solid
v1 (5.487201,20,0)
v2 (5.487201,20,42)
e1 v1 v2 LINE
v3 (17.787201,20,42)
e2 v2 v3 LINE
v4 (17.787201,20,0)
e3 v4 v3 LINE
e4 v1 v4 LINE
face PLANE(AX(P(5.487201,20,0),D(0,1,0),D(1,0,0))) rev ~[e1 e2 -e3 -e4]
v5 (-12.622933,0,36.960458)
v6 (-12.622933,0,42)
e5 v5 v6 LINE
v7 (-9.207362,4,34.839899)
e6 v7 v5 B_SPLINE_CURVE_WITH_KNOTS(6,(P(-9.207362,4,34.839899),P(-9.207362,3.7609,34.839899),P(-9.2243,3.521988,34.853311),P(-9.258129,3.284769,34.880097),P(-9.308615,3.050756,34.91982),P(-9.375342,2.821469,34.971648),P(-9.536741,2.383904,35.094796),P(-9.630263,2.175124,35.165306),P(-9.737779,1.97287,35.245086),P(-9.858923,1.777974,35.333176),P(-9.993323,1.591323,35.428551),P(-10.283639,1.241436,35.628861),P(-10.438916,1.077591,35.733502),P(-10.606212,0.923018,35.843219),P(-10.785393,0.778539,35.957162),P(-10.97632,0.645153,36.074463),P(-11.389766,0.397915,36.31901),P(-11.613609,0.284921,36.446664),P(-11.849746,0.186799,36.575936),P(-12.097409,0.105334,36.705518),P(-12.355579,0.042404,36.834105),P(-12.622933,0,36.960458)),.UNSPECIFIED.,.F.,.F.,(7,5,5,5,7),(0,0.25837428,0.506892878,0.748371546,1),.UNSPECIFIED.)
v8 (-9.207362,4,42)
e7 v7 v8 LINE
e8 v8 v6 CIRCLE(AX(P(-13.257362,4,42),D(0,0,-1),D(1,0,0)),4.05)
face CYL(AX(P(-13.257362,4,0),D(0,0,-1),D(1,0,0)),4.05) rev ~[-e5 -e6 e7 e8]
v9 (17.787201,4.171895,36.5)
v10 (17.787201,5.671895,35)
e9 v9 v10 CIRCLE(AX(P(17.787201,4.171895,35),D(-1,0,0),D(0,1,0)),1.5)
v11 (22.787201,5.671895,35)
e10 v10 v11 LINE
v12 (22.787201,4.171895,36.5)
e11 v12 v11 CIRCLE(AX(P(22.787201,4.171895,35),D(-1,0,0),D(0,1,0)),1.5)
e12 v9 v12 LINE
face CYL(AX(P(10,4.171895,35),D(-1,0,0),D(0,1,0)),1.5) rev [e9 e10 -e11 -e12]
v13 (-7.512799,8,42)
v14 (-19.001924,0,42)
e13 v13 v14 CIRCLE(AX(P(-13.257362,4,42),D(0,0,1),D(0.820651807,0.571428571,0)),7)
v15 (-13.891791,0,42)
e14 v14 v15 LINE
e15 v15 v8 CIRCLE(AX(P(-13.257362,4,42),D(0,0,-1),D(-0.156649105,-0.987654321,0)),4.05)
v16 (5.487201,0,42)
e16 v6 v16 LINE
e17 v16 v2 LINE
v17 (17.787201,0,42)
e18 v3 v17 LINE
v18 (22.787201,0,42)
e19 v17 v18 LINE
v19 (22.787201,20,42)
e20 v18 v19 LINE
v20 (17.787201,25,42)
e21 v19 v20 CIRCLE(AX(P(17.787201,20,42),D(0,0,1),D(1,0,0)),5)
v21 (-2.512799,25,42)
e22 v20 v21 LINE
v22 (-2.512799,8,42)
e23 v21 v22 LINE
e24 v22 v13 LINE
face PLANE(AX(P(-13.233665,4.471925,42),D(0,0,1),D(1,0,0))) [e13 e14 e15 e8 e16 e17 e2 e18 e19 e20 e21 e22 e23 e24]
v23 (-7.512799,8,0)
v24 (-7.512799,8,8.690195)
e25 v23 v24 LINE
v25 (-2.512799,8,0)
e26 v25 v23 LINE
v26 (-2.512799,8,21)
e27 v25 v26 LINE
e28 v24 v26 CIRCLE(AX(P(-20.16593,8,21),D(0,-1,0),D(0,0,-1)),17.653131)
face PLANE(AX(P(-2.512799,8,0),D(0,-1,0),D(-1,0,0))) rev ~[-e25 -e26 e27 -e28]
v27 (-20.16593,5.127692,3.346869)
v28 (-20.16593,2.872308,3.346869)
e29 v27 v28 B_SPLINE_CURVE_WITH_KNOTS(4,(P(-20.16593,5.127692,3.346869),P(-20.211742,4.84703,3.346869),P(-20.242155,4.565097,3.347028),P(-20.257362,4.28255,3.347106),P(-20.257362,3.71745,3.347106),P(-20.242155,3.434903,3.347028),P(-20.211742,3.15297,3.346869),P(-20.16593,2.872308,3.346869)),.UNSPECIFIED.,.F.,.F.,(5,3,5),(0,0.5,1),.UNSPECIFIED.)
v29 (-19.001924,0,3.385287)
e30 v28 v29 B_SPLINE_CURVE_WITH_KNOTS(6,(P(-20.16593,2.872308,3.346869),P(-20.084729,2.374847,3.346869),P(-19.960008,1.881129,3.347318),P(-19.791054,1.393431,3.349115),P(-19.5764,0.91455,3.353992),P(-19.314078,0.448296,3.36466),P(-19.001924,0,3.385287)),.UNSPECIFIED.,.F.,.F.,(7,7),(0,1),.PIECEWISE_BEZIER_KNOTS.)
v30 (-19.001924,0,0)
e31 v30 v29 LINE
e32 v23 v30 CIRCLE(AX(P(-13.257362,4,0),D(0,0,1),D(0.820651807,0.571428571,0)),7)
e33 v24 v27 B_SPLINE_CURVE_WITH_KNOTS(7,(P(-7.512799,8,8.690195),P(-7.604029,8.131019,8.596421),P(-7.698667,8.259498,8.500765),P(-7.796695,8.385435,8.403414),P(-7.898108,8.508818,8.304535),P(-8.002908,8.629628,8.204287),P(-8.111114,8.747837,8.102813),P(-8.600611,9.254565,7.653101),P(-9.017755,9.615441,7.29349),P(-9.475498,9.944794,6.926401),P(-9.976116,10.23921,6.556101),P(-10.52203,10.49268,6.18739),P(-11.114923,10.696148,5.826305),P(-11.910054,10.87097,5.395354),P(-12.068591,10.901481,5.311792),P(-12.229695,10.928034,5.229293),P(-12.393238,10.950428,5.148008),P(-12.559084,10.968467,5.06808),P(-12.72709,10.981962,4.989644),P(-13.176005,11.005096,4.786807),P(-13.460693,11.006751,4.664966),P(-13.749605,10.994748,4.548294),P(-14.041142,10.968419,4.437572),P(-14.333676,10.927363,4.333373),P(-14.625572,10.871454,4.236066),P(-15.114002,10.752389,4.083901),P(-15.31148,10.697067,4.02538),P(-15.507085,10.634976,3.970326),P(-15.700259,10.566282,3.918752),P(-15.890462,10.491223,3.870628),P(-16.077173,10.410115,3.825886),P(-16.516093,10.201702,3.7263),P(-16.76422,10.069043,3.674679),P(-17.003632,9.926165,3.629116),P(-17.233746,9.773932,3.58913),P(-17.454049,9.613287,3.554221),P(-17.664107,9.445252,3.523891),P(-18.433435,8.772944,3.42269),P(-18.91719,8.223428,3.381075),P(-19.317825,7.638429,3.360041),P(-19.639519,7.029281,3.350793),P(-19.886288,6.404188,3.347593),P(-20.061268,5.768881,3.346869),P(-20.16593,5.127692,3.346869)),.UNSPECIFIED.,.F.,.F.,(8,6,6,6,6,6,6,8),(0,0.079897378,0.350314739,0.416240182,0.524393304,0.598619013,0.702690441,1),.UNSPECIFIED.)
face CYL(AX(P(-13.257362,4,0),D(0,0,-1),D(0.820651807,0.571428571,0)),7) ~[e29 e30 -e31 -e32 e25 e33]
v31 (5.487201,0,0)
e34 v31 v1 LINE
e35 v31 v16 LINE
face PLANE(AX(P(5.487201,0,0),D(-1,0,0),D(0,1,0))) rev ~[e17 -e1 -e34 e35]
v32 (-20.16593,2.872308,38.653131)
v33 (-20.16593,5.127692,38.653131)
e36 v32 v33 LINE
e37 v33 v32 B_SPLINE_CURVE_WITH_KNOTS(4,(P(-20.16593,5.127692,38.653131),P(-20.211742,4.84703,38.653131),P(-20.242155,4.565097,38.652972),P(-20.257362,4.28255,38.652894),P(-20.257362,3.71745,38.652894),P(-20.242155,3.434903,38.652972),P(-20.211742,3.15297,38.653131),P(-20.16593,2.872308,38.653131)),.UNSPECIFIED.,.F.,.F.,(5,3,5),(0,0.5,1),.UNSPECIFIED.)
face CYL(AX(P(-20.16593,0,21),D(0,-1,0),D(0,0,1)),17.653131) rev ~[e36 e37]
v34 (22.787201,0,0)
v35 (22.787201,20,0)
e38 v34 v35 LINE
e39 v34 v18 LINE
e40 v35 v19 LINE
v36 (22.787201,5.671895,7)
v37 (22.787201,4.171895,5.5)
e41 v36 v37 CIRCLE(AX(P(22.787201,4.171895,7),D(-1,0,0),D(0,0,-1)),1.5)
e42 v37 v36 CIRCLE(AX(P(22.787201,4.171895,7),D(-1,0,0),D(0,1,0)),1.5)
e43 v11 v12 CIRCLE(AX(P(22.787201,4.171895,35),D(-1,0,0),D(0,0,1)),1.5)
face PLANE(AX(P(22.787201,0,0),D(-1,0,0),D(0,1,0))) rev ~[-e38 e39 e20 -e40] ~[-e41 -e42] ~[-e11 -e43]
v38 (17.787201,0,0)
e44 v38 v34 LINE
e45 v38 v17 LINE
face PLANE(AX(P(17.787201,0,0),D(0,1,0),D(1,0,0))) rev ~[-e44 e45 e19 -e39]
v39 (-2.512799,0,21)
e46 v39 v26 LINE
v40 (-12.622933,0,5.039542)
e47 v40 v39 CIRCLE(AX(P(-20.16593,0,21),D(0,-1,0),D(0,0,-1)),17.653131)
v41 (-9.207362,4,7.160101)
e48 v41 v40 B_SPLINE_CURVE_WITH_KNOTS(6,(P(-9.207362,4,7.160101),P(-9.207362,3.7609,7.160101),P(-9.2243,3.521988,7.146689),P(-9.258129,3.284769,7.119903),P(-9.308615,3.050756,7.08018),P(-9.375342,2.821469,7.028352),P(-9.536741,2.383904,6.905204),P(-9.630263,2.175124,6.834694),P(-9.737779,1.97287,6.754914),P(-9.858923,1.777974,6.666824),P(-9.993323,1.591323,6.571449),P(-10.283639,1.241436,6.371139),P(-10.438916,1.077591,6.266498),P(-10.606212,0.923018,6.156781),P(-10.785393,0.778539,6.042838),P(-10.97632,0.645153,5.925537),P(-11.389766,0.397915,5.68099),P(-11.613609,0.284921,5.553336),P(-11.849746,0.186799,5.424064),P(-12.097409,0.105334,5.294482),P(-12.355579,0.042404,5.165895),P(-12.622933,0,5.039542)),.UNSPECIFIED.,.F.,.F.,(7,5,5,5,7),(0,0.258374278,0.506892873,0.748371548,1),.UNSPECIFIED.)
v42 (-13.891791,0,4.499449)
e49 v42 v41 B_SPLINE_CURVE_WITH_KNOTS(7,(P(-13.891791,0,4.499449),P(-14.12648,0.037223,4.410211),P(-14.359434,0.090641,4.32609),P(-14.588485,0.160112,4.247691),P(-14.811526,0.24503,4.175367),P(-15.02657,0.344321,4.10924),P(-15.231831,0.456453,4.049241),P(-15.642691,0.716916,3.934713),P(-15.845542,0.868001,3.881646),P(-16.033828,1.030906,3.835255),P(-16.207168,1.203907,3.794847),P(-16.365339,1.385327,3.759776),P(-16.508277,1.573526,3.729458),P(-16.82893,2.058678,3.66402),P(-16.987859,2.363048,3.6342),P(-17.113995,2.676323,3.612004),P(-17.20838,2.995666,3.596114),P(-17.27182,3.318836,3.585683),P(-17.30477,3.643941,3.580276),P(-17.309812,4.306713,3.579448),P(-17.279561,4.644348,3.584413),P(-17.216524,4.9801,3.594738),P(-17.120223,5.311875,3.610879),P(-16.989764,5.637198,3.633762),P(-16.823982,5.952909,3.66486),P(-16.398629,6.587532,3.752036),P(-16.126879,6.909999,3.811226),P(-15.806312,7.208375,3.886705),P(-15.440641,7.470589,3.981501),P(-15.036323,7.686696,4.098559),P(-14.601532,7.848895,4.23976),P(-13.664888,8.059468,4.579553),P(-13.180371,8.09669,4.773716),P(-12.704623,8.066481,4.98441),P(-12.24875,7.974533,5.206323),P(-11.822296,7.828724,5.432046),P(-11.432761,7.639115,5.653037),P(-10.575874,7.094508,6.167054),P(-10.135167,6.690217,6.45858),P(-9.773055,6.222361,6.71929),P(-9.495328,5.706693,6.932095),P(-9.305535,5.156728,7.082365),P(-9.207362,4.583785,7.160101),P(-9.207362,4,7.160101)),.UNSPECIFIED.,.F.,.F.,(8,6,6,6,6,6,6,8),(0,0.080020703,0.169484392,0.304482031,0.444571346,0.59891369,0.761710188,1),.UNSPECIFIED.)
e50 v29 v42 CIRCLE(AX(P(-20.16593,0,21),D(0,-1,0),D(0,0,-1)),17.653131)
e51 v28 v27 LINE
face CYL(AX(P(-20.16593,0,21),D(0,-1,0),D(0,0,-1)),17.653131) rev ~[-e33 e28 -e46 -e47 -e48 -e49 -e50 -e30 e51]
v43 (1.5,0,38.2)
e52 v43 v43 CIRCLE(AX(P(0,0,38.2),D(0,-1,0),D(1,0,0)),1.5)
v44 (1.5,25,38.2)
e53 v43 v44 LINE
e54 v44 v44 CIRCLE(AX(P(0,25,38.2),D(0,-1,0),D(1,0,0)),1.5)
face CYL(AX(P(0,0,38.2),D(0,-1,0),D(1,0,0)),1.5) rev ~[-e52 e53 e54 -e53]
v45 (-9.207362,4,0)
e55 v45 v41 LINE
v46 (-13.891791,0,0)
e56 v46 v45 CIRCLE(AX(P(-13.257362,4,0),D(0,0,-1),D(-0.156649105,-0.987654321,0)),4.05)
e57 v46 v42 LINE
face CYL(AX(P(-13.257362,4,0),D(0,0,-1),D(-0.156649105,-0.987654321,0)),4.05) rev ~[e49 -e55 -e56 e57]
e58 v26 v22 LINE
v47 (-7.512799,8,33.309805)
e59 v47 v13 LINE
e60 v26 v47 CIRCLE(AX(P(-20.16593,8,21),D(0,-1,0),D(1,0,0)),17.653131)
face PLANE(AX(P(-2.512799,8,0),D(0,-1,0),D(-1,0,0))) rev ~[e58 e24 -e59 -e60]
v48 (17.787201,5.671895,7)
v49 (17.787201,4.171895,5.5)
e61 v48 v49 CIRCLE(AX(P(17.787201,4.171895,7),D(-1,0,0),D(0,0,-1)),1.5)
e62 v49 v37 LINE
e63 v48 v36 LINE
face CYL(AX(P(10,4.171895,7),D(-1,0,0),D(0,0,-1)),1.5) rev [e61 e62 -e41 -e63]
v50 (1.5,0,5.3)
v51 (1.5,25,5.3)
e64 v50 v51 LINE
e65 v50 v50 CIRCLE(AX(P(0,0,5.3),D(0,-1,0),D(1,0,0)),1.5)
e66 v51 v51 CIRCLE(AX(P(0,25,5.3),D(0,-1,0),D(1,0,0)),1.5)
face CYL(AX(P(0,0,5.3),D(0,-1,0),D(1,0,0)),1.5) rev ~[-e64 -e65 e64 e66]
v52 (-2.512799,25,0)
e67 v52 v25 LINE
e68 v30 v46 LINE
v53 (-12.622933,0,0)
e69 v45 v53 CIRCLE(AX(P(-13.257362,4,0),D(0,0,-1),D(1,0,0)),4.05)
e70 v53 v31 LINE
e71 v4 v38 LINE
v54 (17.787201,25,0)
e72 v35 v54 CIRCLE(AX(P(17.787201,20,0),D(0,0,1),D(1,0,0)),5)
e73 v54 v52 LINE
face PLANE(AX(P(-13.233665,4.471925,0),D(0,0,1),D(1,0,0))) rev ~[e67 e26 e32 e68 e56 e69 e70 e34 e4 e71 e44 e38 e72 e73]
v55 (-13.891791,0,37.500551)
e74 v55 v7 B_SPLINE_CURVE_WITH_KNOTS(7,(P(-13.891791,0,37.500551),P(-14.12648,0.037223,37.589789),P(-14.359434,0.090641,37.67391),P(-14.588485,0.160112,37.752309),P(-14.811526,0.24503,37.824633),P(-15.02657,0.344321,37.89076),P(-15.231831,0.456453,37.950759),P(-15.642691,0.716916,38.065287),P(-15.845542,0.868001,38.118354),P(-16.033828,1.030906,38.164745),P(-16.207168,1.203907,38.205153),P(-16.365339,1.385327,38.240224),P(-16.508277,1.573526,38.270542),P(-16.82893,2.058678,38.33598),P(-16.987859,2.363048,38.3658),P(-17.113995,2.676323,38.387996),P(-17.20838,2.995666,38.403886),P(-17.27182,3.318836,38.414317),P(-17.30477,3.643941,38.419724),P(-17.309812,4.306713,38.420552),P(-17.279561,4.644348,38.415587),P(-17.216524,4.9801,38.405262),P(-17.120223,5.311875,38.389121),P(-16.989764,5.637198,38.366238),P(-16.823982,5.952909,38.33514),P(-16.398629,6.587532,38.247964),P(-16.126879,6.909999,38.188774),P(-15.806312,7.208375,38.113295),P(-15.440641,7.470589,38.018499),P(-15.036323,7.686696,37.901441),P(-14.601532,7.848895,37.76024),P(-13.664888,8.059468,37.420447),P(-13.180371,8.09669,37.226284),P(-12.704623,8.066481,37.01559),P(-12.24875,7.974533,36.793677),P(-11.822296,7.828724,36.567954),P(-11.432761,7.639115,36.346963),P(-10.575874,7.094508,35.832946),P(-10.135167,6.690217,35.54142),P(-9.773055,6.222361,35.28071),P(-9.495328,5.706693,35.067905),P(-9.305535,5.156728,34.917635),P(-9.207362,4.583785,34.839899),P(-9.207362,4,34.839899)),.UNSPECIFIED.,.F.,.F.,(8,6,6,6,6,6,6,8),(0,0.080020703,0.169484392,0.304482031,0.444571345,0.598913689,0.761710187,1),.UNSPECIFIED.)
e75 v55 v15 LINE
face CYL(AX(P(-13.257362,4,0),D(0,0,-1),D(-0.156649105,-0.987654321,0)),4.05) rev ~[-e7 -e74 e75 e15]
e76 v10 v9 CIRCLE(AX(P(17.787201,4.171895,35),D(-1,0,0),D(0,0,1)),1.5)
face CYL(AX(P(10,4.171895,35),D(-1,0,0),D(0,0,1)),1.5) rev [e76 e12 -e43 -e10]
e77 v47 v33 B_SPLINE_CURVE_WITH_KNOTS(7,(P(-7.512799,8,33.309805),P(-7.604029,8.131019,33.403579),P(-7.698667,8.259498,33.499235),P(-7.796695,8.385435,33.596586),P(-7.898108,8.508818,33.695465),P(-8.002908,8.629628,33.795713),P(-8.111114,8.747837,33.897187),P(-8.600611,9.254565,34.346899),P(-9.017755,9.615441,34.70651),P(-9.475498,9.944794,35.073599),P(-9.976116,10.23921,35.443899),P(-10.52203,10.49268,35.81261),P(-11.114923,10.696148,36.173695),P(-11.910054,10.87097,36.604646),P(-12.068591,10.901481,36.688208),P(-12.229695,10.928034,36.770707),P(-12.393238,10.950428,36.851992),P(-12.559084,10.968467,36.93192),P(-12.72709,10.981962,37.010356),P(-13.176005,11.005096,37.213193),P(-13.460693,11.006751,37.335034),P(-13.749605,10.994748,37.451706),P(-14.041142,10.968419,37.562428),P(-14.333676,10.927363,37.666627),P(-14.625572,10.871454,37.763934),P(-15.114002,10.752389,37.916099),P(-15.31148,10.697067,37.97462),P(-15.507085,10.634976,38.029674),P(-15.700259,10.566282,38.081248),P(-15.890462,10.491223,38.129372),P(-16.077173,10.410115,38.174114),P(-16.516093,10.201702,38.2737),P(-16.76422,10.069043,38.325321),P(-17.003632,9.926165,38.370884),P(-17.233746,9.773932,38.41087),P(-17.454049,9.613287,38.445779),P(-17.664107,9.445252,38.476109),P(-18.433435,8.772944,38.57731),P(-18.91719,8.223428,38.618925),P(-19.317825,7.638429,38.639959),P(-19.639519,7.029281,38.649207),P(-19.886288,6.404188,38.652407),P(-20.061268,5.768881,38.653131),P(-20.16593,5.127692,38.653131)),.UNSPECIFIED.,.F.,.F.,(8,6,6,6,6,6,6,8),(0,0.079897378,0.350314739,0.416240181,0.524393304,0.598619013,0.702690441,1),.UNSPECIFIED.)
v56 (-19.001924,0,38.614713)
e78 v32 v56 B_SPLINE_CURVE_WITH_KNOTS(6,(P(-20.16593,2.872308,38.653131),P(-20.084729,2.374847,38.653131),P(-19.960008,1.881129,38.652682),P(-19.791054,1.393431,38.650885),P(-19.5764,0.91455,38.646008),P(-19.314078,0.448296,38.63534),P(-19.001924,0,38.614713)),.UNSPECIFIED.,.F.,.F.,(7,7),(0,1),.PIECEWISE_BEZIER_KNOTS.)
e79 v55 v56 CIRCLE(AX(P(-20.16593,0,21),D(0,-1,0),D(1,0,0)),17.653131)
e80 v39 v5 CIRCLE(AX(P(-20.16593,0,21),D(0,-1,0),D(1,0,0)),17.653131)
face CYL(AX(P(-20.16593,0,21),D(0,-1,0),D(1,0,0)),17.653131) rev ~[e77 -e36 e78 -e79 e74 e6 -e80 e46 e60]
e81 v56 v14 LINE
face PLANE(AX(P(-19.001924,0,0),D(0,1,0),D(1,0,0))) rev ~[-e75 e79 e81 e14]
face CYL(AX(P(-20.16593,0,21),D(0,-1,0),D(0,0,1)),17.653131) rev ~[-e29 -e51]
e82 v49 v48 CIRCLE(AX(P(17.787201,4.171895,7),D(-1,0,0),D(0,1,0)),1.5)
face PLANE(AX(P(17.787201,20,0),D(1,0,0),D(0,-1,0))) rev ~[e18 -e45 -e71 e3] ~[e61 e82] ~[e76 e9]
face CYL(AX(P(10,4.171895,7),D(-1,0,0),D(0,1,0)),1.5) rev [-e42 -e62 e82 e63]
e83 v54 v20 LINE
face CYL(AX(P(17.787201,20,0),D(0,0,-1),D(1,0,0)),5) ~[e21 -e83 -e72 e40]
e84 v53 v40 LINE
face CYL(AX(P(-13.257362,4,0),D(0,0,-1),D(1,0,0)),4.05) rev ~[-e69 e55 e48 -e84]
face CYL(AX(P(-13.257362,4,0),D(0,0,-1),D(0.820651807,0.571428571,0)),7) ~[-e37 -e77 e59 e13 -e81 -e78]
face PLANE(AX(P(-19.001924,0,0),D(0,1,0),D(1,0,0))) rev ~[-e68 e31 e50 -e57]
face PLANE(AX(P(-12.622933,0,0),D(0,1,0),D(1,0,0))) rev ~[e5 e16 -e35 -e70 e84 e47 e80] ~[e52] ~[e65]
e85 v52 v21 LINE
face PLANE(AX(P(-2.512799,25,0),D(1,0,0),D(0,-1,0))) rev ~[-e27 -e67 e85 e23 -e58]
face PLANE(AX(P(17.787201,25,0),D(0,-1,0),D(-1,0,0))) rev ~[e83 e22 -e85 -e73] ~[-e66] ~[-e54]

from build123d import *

# Parameters (mm, degrees)
F1_DEPTH      = 42
F2_R          = 1.5
F3_DEPTH      = 25.001
F3_DEPTH_BACK = 90
F6_DEPTH      = 25


# Not quite as in the source:
# - an extrude ends at something that could not be found from the text; its depth is read off the source's solid


with BuildPart() as f1:
    # F0 (on Top) → F1 (new body)
    with BuildSketch(Plane.XY):
        with BuildLine():
            Line((-12.622932768, 0), (-7.5127989985, 0))
            Line((-7.5127989985, 0), (-7.5127989985, 8))
            ThreePointArc((-7.5127989985, 8), (-17.257361645, 9.7445626465), (-19.0019242916, 0))
            Line((-19.0019242916, 0), (-13.8917905221, 0))
            ThreePointArc((-13.8917905221, 0), (-15.8872915916, 7.0799299466), (-9.207361645, 4))
            ThreePointArc((-9.207361645, 4), (-10.1774316984, 1.3700700534), (-12.622932768, 0))
        make_face()
        with BuildLine():
            ThreePointArc((-6.257361645, 4), (-6.5785916039, 1.9038056538), (-7.5127989985, 0))
            Line((-7.5127989985, 0), (-2.5127989985, 0))
            Line((-2.5127989985, 0), (-2.5127989985, 8))
            Line((-2.5127989985, 8), (-7.5127989985, 8))
            ThreePointArc((-7.5127989985, 8), (-6.5785916039, 6.0961943462), (-6.257361645, 4))
        make_face()
        with BuildLine():
            Line((-7.5127989985, 8), (-7.5127989985, 0))
            ThreePointArc((-7.5127989985, 0), (-6.5785916039, 1.9038056538), (-6.257361645, 4))
            ThreePointArc((-6.257361645, 4), (-6.5785916039, 6.0961943462), (-7.5127989985, 8))
        make_face()
        with BuildLine():
            Line((-2.5127989985, 8), (-2.5127989985, 0))
            Line((-2.5127989985, 0), (5.4872010015, 0))
            Line((5.4872010015, 0), (5.4872010015, 20))
            Line((5.4872010015, 20), (17.7872010015, 20))
            Line((17.7872010015, 20), (17.7872010015, 0))
            Line((17.7872010015, 0), (22.7872010015, 0))
            Line((22.7872010015, 0), (22.7872010015, 20))
            ThreePointArc((22.7872010015, 20), (21.3227349074, 23.5355339059), (17.7872010015, 25))
            Line((17.7872010015, 25), (-2.5127989985, 25))
            Line((-2.5127989985, 25), (-2.5127989985, 8))
        make_face()
    extrude(amount=F1_DEPTH)

    # F2 (on Front) → F3 (cut, two sides)
    with BuildSketch(Plane.XZ) as f3_sk:
        with BuildLine():
            Line((-20.1659295708, 21), (-20.1659295708, 38.6531305723))
            ThreePointArc((-20.1659295708, 38.6531305723), (-37.8190601431, 21), (-20.1659295708, 3.3468694277))
            Line((-20.1659295708, 3.3468694277), (-20.1659295708, 21))
        make_face()
        with BuildLine():
            ThreePointArc((-20.1659295708, 3.3468694277), (-7.683281234, 8.5173516632), (-2.5127989985, 21))
            Line((-2.5127989985, 21), (-20.1659295708, 21))
            Line((-20.1659295708, 21), (-20.1659295708, 3.3468694277))
        make_face()
        with Locations((0, 38.2)):
            Circle(F2_R)
        with Locations((0, 5.3)):
            Circle(F2_R)
        with BuildLine():
            Line((-20.1659295708, 21), (-2.5127989985, 21))
            ThreePointArc((-2.5127989985, 21), (-7.683281234, 33.4826483368), (-20.1659295708, 38.6531305723))
            Line((-20.1659295708, 38.6531305723), (-20.1659295708, 21))
        make_face()
    extrude(amount=-F3_DEPTH, mode=Mode.SUBTRACT)
    extrude(f3_sk.sketch, amount=F3_DEPTH_BACK, mode=Mode.SUBTRACT)

    # F5 (on offset) → F6 (cut)
    with BuildSketch(Plane.YZ.offset(10)):
        with BuildLine():
            ThreePointArc((4.1718953289, 5.5), (5.2325555007, 5.9393398282), (5.6718953289, 7))
            ThreePointArc((5.6718953289, 7), (3.1112351571, 8.0606601718), (4.1718953289, 5.5))
        make_face()
        with BuildLine():
            ThreePointArc((4.1718953289, 36.5), (3.1112351571, 33.9393398282), (5.6718953289, 35))
            ThreePointArc((5.6718953289, 35), (5.2325555007, 36.0606601718), (4.1718953289, 36.5))
        make_face()
    extrude(amount=F6_DEPTH, mode=Mode.SUBTRACT)


solid = f1.part
